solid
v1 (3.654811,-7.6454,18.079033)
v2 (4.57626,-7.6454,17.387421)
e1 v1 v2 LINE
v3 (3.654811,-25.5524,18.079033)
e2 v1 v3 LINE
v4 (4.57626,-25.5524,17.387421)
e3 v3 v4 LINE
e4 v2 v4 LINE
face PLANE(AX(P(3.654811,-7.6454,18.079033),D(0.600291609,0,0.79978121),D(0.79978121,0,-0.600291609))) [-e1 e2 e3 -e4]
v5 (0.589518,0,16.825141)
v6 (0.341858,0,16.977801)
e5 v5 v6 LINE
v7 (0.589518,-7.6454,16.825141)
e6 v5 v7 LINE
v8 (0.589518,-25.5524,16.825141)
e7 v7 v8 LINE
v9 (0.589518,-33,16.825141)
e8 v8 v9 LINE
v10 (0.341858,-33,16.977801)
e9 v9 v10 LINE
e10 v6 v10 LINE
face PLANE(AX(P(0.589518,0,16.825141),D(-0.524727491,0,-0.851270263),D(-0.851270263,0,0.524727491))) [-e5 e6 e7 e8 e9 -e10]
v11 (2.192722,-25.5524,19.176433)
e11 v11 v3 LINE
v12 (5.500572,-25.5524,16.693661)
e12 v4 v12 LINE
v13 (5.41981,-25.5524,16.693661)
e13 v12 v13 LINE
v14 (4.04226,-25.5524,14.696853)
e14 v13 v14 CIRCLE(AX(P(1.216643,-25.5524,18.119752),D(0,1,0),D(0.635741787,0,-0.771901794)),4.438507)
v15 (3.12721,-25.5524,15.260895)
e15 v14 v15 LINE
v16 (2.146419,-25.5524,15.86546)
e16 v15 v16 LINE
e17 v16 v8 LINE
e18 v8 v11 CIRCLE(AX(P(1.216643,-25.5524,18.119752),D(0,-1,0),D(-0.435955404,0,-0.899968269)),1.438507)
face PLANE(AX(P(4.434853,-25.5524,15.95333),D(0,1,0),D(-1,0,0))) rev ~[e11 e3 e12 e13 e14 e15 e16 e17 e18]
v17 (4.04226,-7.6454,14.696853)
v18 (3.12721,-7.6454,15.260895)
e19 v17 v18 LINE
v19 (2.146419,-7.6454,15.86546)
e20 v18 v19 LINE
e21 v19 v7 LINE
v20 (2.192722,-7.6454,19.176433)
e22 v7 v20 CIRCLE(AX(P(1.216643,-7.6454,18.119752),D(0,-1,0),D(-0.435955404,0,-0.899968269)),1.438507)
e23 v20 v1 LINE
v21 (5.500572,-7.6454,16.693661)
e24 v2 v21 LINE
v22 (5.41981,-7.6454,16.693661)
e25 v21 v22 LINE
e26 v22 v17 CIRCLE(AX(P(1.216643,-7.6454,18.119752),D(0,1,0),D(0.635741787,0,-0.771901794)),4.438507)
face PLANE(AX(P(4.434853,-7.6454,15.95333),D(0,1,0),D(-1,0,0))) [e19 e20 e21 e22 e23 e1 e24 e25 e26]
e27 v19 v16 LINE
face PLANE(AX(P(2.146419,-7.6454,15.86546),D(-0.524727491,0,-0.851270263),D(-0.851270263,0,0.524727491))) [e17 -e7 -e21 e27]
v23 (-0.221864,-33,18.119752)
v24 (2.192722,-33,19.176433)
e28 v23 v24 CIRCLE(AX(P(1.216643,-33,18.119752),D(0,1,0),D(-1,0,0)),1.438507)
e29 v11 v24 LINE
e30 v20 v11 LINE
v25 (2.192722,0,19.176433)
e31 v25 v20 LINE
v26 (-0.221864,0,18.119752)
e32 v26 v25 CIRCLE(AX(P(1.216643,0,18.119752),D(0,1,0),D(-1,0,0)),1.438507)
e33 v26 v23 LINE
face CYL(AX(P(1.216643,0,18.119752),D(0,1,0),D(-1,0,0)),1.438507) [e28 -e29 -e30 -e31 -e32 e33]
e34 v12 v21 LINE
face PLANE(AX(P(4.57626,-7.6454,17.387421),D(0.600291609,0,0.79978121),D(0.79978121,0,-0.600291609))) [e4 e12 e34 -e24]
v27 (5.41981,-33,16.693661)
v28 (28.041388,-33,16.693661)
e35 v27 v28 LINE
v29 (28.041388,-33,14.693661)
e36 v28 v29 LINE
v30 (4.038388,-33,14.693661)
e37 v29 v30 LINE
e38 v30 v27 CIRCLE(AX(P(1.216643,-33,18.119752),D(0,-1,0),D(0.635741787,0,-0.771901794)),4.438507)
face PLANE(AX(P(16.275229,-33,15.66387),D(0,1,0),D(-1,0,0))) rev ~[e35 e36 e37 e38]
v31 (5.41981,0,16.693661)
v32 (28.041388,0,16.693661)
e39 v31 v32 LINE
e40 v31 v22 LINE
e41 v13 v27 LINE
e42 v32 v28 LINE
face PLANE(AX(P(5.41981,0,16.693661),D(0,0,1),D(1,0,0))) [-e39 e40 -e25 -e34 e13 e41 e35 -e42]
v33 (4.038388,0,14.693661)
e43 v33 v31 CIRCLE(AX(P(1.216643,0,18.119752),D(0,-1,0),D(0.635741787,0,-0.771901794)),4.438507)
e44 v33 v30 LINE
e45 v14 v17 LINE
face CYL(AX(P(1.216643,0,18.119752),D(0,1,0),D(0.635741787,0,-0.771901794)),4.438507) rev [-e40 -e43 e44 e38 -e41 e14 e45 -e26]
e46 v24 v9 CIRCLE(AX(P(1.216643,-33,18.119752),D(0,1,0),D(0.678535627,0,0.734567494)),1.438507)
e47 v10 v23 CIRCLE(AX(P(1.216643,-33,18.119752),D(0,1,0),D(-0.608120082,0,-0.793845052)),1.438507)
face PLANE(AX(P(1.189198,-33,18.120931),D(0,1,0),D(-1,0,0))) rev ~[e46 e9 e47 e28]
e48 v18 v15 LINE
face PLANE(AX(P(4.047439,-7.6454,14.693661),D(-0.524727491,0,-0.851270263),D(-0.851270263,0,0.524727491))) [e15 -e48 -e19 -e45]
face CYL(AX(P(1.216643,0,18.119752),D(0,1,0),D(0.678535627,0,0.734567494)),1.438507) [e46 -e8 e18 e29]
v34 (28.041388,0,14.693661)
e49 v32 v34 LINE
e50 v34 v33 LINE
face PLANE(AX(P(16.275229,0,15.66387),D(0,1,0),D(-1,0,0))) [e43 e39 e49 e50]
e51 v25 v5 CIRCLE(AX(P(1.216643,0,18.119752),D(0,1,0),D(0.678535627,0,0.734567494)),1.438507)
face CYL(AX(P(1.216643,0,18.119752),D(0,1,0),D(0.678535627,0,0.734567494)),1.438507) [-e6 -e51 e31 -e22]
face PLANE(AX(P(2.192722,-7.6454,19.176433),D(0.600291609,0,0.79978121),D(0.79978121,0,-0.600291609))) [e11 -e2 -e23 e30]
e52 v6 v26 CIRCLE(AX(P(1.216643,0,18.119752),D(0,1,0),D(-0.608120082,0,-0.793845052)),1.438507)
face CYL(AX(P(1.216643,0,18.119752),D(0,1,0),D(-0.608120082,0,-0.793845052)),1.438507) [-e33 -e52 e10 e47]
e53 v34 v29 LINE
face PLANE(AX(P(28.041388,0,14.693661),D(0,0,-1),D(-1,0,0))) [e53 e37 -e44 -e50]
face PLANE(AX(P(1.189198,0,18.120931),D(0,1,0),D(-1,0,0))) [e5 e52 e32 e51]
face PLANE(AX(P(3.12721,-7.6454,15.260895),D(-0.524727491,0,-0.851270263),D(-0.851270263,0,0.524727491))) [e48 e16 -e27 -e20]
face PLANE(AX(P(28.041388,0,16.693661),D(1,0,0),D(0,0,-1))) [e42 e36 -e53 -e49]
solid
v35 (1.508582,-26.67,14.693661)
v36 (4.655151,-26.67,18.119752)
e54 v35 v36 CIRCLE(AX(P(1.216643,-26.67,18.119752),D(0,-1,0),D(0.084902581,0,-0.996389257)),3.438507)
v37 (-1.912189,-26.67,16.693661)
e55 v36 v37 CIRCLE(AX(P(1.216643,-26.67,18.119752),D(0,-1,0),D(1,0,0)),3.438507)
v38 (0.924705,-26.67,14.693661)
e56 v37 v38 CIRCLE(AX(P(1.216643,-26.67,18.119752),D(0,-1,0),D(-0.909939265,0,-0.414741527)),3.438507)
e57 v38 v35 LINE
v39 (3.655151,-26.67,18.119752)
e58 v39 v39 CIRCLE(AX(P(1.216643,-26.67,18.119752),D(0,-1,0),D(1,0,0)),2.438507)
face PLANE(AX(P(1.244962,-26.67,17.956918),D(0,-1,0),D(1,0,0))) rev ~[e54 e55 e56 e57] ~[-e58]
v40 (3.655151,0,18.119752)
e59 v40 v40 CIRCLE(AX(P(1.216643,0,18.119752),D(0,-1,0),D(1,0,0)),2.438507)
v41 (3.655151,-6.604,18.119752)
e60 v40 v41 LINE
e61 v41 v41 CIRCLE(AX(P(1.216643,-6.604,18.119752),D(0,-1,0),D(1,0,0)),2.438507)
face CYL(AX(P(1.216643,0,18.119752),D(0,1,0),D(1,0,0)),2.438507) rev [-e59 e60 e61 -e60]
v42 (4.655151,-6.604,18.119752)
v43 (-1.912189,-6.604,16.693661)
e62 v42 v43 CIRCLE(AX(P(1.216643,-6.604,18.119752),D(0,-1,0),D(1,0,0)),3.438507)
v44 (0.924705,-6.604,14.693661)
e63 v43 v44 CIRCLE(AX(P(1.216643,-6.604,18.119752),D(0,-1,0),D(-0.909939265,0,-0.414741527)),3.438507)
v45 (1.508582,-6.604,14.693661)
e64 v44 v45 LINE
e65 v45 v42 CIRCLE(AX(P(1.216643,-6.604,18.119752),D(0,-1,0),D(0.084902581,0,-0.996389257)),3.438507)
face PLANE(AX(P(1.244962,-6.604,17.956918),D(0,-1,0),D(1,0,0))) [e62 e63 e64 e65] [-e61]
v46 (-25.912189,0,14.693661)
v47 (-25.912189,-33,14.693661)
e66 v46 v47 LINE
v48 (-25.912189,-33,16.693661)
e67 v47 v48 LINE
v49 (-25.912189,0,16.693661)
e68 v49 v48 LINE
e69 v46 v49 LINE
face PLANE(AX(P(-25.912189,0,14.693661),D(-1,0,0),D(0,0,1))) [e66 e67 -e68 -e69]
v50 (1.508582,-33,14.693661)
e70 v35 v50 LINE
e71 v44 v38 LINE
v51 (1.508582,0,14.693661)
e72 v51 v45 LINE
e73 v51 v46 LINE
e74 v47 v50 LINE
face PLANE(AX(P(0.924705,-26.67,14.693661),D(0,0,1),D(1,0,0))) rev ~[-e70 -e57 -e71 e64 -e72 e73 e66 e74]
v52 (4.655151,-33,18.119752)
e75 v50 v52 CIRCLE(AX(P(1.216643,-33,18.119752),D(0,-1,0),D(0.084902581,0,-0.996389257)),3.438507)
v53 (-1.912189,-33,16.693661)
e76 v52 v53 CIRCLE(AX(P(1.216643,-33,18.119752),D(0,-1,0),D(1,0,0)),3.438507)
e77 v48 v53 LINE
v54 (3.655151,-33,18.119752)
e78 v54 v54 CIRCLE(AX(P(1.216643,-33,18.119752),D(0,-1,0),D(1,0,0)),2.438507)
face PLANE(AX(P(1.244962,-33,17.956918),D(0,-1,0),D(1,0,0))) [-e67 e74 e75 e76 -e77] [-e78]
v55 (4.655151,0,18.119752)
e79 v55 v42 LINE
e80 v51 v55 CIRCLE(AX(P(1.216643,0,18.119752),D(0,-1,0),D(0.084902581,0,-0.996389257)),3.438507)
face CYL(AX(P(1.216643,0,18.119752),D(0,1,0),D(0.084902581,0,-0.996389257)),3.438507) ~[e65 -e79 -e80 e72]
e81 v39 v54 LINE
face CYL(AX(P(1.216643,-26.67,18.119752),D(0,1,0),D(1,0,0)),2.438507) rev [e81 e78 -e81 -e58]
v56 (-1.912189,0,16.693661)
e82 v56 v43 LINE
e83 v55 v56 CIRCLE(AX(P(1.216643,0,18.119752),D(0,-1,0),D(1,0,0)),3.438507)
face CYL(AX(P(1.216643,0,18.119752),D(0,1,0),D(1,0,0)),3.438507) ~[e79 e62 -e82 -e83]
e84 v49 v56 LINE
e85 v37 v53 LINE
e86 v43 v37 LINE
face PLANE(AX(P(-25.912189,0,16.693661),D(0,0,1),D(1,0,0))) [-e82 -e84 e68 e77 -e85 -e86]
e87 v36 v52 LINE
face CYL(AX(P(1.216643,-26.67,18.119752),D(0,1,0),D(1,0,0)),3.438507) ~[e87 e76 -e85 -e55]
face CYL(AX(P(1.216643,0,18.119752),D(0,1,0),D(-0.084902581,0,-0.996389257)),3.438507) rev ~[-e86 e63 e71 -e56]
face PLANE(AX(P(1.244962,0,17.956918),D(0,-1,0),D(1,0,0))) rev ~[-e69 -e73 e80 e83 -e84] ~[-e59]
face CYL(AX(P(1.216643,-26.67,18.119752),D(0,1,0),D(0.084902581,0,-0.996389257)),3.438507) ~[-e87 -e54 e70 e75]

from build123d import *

# Parameters (mm, degrees)
F0_W     = 24
F0_H     = 2
F1_DEPTH = 33
F0_R     = 2.4385073591
F2_DEPTH = 6.604
F3_START = 26.67
F3_DEPTH = 6.33
F5_DEPTH = 33
F7_DEPTH = 33
F8_START = -7.6454
F8_DEPTH = 17.907


with BuildPart() as f1:
    # F0 (on Front) → F1 (new body)
    with BuildSketch(Plane.XZ):
        with Locations((-13.9121894147, 15.6936606616)):
            Rectangle(F0_W, F0_H)
        with BuildLine():
            ThreePointArc((0.9247052946, 14.6936606616), (-0.764623467, 15.3094296465), (-1.9121894147, 16.6936606616))
            Line((-1.9121894147, 16.6936606616), (-1.9121894147, 14.6936606616))
            Line((-1.9121894147, 14.6936606616), (0.9247052946, 14.6936606616))
        make_face()
    extrude(amount=F1_DEPTH)

    # F0 (on Front) → F2 (join)
    with BuildSketch(Plane.XZ):
        with BuildLine():
            ThreePointArc((4.6551508029, 18.1197524549), (0.4869798056, 21.4799494482), (-1.9121894147, 16.6936606616))
            ThreePointArc((-1.9121894147, 16.6936606616), (-0.764623467, 15.3094296465), (0.9247052946, 14.6936606616))
            Line((0.9247052946, 14.6936606616), (1.5085815929, 14.6936606616))
            ThreePointArc((1.5085815929, 14.6936606616), (3.7491485605, 15.7938653784), (4.6551508029, 18.1197524549))
        make_face()
        with Locations((1.2166434437, 18.1197524549)):
            Circle(F0_R, mode=Mode.SUBTRACT)
    extrude(amount=F2_DEPTH)

    # F0 (on Front) → F3 (join)
    with BuildSketch(Plane.XZ.offset(F3_START)):
        with BuildLine():
            ThreePointArc((4.6551508029, 18.1197524549), (0.4869798056, 21.4799494482), (-1.9121894147, 16.6936606616))
            ThreePointArc((-1.9121894147, 16.6936606616), (-0.764623467, 15.3094296465), (0.9247052946, 14.6936606616))
            Line((0.9247052946, 14.6936606616), (1.5085815929, 14.6936606616))
            ThreePointArc((1.5085815929, 14.6936606616), (3.7491485605, 15.7938653784), (4.6551508029, 18.1197524549))
        make_face()
        with Locations((1.2166434437, 18.1197524549)):
            Circle(F0_R, mode=Mode.SUBTRACT)
    extrude(amount=F3_DEPTH)


with BuildPart() as f5:
    # F4 (on face) → F5 (new body, through all)
    with BuildSketch(Plane(origin=(0, 0, 0), x_dir=(-1, 0, 0), z_dir=(0, 1, 0))):
        with BuildLine():
            Line((-15.8450398594, 14.6936606616), (-4.0383880461, 14.6936606616))
            ThreePointArc((-4.0383880461, 14.6936606616), (-4.8686763678, 15.5972530795), (-5.4198100802, 16.6936606616))
            Line((-5.4198100802, 16.6936606616), (-10.0691048428, 16.6936606616))
            Line((-10.0691048428, 16.6936606616), (-28.0413880461, 16.6936606616))
            Line((-28.0413880461, 16.6936606616), (-28.0413880461, 14.6936606616))
            Line((-28.0413880461, 14.6936606616), (-15.8450398594, 14.6936606616))
        make_face()
    extrude(amount=-F5_DEPTH)



with BuildPart() as f7:
    # F6 (on face) → F7 (new body, through all)
    with BuildSketch(Plane(origin=(0, 0, 0), x_dir=(-1, 0, 0), z_dir=(0, 1, 0))):
        with BuildLine():
            ThreePointArc((-0.3418582309, 16.9778005059), (0.073257403, 17.4829956504), (0.2218639154, 18.1197524549))
            ThreePointArc((0.2218639154, 18.1197524549), (-0.6399254334, 19.4375915038), (-2.1927219368, 19.1764332002))
            ThreePointArc((-2.1927219368, 19.1764332002), (-2.4051657689, 17.3093709984), (-0.5895183864, 16.8251414767))
            Line((-0.5895183864, 16.8251414767), (-0.3418582309, 16.9778005059))
        make_face()
    extrude(amount=-F7_DEPTH)


with BuildPart() as f5_1:
    add(f5.part)

    add(f7.part)  # F8 merges F7
    # F6 (on face) → F8 (join)
    with BuildSketch(Plane(origin=(0, 0, 0), x_dir=(-1, 0, 0), z_dir=(0, 1, 0)).offset(F8_START)):
        with BuildLine():
            ThreePointArc((-3.1272102801, 15.2608947769), (-4.0581637221, 16.1834943713), (-4.5762601156, 17.3874214661))
            Line((-4.5762601156, 17.3874214661), (-5.6122234091, 16.6098587215))
            Line((-5.6122234091, 16.6098587215), (-4.681289196, 14.9995945394))
            Line((-4.681289196, 14.9995945394), (-4.0474394336, 14.6936606616))
            Line((-4.0474394336, 14.6936606616), (-3.1272102801, 15.2608947769))
        make_face()
        with BuildLine():
            ThreePointArc((-0.5895183864, 16.8251414767), (-2.4051657689, 17.3093709984), (-2.1927219368, 19.1764332002))
            Line((-2.1927219368, 19.1764332002), (-3.6548108098, 18.0790334718))
            ThreePointArc((-3.6548108098, 18.0790334718), (-3.231770478, 16.7465877975), (-2.1464189491, 15.8654597387))
            Line((-2.1464189491, 15.8654597387), (-0.5895183864, 16.8251414767))
        make_face()
        with BuildLine():
            ThreePointArc((-2.1464189491, 15.8654597387), (-3.231770478, 16.7465877975), (-3.6548108098, 18.0790334718))
            Line((-3.6548108098, 18.0790334718), (-4.5762601156, 17.3874214661))
            ThreePointArc((-4.5762601156, 17.3874214661), (-4.0581637221, 16.1834943713), (-3.1272102801, 15.2608947769))
            Line((-3.1272102801, 15.2608947769), (-2.1464189491, 15.8654597387))
        make_face()
    extrude(amount=-F8_DEPTH)


solid = Compound([f1.part, f5_1.part])
